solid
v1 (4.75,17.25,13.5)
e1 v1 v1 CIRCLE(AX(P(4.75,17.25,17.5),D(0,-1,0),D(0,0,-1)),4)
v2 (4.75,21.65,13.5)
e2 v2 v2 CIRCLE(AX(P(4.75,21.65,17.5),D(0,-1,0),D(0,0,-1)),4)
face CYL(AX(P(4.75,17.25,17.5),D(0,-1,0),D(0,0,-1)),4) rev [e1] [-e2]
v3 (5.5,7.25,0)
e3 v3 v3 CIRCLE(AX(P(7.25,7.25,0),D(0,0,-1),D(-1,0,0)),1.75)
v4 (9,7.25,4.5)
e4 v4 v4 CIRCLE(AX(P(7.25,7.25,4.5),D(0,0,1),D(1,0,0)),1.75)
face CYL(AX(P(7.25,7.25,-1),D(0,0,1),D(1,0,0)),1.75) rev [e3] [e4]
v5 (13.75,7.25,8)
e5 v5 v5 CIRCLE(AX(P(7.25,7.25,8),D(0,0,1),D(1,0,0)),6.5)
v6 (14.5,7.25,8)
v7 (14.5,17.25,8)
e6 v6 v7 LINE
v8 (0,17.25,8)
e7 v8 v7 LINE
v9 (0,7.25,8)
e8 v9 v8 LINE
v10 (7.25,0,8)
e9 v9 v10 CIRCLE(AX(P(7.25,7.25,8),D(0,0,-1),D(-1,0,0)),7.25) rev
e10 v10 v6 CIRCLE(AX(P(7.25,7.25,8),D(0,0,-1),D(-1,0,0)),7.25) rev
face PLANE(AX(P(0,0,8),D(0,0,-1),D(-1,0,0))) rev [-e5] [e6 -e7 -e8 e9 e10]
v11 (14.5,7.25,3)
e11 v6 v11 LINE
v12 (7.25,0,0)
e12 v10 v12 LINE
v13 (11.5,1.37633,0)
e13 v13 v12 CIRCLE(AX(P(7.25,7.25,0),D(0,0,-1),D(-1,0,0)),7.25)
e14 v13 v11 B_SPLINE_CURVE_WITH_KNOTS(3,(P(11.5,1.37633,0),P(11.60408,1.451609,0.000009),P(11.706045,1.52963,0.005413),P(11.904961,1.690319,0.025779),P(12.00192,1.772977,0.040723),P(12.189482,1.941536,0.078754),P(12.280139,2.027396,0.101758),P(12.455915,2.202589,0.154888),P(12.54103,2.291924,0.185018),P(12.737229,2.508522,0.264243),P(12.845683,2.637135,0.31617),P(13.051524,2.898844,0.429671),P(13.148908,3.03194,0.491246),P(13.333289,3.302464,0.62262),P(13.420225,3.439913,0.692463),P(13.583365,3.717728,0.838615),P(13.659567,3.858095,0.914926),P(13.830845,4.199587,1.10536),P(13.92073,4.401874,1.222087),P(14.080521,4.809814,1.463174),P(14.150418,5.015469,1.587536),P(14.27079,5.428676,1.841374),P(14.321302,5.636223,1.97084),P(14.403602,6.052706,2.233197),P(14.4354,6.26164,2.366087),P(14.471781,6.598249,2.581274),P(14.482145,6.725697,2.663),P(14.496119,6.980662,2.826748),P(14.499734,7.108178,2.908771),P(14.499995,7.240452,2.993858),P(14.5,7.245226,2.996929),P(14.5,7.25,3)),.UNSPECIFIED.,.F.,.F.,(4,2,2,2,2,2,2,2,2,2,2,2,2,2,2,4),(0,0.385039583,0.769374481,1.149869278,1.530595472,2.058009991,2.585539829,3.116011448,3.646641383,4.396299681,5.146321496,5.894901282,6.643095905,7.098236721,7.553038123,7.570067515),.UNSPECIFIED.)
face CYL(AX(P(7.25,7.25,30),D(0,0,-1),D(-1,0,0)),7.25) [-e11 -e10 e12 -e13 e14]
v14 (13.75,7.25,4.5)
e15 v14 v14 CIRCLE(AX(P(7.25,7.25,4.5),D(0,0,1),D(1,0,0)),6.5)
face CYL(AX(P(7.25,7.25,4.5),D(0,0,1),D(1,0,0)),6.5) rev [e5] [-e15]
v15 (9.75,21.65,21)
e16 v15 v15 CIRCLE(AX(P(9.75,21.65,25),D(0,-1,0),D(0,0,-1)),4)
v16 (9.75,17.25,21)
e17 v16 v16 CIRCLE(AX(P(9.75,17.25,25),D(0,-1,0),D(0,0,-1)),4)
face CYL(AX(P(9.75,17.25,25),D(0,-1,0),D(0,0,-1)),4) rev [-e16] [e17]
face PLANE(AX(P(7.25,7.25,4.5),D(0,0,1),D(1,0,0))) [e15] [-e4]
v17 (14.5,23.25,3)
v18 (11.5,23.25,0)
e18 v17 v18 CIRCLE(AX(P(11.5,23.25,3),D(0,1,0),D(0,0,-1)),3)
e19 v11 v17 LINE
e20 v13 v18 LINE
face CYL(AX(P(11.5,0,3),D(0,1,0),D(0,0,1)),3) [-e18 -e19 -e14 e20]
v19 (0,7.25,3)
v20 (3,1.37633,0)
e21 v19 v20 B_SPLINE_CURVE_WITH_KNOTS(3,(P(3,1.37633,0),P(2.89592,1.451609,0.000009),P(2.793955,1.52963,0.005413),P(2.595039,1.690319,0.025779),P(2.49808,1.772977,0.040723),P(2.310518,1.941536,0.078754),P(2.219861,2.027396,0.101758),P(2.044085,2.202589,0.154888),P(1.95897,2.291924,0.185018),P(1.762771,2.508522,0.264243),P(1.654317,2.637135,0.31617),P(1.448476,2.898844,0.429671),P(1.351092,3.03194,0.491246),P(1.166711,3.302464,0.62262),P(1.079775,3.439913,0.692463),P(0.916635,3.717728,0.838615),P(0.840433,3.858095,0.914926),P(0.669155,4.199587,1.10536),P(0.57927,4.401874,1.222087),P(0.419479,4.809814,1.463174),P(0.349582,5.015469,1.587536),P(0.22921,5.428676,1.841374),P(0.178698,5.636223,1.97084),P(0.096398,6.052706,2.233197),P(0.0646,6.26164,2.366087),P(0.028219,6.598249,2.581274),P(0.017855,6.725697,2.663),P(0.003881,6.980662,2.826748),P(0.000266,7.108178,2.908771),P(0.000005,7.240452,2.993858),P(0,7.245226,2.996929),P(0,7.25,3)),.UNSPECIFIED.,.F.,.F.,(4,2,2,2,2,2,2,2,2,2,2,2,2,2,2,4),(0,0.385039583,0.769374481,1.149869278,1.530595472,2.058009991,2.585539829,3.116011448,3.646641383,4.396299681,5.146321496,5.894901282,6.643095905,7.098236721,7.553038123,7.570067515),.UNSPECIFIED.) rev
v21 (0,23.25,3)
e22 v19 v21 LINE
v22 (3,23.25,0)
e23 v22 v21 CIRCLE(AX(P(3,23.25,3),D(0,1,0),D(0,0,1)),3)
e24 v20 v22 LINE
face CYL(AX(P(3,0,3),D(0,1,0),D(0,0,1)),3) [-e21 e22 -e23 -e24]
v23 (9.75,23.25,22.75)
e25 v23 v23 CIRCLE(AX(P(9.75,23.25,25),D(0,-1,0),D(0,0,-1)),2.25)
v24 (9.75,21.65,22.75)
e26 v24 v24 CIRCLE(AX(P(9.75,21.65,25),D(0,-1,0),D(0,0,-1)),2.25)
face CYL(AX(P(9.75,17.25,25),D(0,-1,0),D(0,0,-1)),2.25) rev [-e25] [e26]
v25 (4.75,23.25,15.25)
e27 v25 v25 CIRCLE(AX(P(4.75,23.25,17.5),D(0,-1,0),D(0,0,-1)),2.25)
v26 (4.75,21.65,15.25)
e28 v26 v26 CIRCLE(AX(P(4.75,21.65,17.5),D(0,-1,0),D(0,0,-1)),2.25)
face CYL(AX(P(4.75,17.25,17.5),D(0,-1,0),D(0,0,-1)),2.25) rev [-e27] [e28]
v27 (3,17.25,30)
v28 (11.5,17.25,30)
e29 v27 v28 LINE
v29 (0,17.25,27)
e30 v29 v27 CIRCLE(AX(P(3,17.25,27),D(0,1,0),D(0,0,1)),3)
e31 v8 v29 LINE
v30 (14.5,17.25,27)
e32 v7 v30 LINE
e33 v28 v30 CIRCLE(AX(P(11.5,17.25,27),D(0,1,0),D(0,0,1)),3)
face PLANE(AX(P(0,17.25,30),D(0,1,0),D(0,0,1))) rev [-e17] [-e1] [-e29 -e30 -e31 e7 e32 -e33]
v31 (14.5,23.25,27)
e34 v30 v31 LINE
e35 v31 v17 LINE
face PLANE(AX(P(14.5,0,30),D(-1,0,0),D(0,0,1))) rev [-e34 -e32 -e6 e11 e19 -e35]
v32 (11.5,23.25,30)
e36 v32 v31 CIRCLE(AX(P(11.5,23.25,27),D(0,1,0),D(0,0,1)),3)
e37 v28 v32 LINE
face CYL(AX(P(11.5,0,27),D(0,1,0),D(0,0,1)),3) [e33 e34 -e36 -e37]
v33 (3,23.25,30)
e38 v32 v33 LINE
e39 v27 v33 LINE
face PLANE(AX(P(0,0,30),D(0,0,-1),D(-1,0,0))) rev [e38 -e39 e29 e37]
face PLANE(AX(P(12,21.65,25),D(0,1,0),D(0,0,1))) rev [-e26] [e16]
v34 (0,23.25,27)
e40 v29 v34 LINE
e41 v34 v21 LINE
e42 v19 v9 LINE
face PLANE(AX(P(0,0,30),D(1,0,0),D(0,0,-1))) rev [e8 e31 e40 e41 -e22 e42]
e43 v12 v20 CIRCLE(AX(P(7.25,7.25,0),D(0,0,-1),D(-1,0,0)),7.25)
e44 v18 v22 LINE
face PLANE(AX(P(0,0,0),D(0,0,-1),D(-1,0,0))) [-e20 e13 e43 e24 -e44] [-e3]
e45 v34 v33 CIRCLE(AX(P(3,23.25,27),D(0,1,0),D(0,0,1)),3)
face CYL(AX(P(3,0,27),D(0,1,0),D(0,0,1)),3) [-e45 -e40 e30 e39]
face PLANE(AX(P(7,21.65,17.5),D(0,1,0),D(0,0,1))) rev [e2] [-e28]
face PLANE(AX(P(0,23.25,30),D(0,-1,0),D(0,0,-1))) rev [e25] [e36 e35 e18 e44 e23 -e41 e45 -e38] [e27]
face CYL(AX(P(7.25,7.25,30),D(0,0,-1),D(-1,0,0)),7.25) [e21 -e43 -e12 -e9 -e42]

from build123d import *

# Parameters (mm, degrees)
SKIZZE1_W                                            = 14.5
SKIZZE1_H                                            = 23.25
AUFSATZ_LINEAR_AUSTRAGEN1_DEPTH                      = 30
SKIZZE5_W                                            = 22
SKIZZE5_H                                            = 17.25
SCHNITT_LINEAR_AUSTRAGEN3_DEPTH                      = 41.630191976
VERRUNDUNG1_R                                        = 7.25
STIRNSENKUNG_F_R_M4_ZYLINDERSCHRAUBE_MIT_D           = 4.5
STIRNSENKUNG_F_R_M4_ZYLINDERSCHRAUBE_MIT_CBORE_D     = 8
STIRNSENKUNG_F_R_M4_ZYLINDERSCHRAUBE_MIT_CBORE_DEPTH = 4.4
SKIZZE9_R                                            = 6.5
SCHNITT_LINEAR_AUSTRAGEN4_DEPTH                      = 3.5
SKIZZE10_R                                           = 1.75
SCHNITT_LINEAR_AUSTRAGEN5_DEPTH                      = 5.5
SKIZZE11_OUTSIDE_W                                   = 24.626
SKIZZE11_OUTSIDE_H                                   = 40.126
SCHNITT_LINEAR_AUSTRAGEN6_DEPTH                      = 41.630191976


with BuildPart() as part:
    # Skizze1 → Aufsatz-Linear austragen1 (new body)
    with BuildSketch(Plane.XY):
        with Locations((7.25, 11.625)):
            Rectangle(SKIZZE1_W, SKIZZE1_H)
    extrude(amount=AUFSATZ_LINEAR_AUSTRAGEN1_DEPTH)

    # Skizze5 → Schnitt-Linear austragen3 (cut, through all)
    with BuildSketch(Plane(origin=(14.5, 0, 0), x_dir=(0, 0, -1), z_dir=(1, 0, 0))):
        with Locations((-19, 8.625)):
            Rectangle(SKIZZE5_W, SKIZZE5_H)
    extrude(amount=-SCHNITT_LINEAR_AUSTRAGEN3_DEPTH, mode=Mode.SUBTRACT)

    # Verrundung1
    verrundung1_edges = [part.edges().sort_by_distance(p)[0] for p in [
        (14.5, 0, 4),
        (0, 0, 4),
    ]]
    fillet(verrundung1_edges, radius=VERRUNDUNG1_R - 0.0001)  # a hair under: the kernel refuses the full size

    # Stirnsenkung für M4 Zylinderschraube mit Innensechskant1 (through all)
    with Locations(Plane(origin=(0, 17.25, 0), x_dir=(-1, 0, 0), z_dir=(0, -1, 0))):
        with Locations((-4.75, -17.5), (-9.75, -25)):
            CounterBoreHole(STIRNSENKUNG_F_R_M4_ZYLINDERSCHRAUBE_MIT_D / 2, STIRNSENKUNG_F_R_M4_ZYLINDERSCHRAUBE_MIT_CBORE_D / 2, STIRNSENKUNG_F_R_M4_ZYLINDERSCHRAUBE_MIT_CBORE_DEPTH)

    # Skizze9 → Schnitt-Linear austragen4 (cut)
    with BuildSketch(Plane.XY.offset(8)):
        with Locations((7.25, 7.25)):
            Circle(SKIZZE9_R)
    extrude(amount=-SCHNITT_LINEAR_AUSTRAGEN4_DEPTH, mode=Mode.SUBTRACT)

    # Skizze10 → Schnitt-Linear austragen5 (cut)
    with BuildSketch(Plane.XY.offset(4.5)):
        with Locations((7.25, 7.25)):
            Circle(SKIZZE10_R)
    extrude(amount=-SCHNITT_LINEAR_AUSTRAGEN5_DEPTH, mode=Mode.SUBTRACT)

    # Skizze11 outside → Schnitt-Linear austragen6 (cut, through all)
    with BuildSketch(Plane(origin=(0, 23.25, 0), x_dir=(1, 0, 0), z_dir=(0, 1, 0))):
        with Locations((7.25, -15)):
            Rectangle(SKIZZE11_OUTSIDE_W, SKIZZE11_OUTSIDE_H)
        with BuildLine():
            Line((3, 0), (11.5, 0))
            ThreePointArc((11.5, 0), (13.621320344, -0.878679656), (14.5, -3))
            Line((14.5, -3), (14.5, -27))
            ThreePointArc((14.5, -27), (13.621320344, -29.121320344), (11.5, -30))
            Line((11.5, -30), (3, -30))
            ThreePointArc((3, -30), (0.878679656, -29.121320344), (0, -27))
            Line((0, -27), (0, -3))
            ThreePointArc((0, -3), (0.878679656, -0.878679656), (3, 0))
        make_face(mode=Mode.SUBTRACT)
    extrude(amount=-SCHNITT_LINEAR_AUSTRAGEN6_DEPTH, mode=Mode.SUBTRACT)


solid = part.part
